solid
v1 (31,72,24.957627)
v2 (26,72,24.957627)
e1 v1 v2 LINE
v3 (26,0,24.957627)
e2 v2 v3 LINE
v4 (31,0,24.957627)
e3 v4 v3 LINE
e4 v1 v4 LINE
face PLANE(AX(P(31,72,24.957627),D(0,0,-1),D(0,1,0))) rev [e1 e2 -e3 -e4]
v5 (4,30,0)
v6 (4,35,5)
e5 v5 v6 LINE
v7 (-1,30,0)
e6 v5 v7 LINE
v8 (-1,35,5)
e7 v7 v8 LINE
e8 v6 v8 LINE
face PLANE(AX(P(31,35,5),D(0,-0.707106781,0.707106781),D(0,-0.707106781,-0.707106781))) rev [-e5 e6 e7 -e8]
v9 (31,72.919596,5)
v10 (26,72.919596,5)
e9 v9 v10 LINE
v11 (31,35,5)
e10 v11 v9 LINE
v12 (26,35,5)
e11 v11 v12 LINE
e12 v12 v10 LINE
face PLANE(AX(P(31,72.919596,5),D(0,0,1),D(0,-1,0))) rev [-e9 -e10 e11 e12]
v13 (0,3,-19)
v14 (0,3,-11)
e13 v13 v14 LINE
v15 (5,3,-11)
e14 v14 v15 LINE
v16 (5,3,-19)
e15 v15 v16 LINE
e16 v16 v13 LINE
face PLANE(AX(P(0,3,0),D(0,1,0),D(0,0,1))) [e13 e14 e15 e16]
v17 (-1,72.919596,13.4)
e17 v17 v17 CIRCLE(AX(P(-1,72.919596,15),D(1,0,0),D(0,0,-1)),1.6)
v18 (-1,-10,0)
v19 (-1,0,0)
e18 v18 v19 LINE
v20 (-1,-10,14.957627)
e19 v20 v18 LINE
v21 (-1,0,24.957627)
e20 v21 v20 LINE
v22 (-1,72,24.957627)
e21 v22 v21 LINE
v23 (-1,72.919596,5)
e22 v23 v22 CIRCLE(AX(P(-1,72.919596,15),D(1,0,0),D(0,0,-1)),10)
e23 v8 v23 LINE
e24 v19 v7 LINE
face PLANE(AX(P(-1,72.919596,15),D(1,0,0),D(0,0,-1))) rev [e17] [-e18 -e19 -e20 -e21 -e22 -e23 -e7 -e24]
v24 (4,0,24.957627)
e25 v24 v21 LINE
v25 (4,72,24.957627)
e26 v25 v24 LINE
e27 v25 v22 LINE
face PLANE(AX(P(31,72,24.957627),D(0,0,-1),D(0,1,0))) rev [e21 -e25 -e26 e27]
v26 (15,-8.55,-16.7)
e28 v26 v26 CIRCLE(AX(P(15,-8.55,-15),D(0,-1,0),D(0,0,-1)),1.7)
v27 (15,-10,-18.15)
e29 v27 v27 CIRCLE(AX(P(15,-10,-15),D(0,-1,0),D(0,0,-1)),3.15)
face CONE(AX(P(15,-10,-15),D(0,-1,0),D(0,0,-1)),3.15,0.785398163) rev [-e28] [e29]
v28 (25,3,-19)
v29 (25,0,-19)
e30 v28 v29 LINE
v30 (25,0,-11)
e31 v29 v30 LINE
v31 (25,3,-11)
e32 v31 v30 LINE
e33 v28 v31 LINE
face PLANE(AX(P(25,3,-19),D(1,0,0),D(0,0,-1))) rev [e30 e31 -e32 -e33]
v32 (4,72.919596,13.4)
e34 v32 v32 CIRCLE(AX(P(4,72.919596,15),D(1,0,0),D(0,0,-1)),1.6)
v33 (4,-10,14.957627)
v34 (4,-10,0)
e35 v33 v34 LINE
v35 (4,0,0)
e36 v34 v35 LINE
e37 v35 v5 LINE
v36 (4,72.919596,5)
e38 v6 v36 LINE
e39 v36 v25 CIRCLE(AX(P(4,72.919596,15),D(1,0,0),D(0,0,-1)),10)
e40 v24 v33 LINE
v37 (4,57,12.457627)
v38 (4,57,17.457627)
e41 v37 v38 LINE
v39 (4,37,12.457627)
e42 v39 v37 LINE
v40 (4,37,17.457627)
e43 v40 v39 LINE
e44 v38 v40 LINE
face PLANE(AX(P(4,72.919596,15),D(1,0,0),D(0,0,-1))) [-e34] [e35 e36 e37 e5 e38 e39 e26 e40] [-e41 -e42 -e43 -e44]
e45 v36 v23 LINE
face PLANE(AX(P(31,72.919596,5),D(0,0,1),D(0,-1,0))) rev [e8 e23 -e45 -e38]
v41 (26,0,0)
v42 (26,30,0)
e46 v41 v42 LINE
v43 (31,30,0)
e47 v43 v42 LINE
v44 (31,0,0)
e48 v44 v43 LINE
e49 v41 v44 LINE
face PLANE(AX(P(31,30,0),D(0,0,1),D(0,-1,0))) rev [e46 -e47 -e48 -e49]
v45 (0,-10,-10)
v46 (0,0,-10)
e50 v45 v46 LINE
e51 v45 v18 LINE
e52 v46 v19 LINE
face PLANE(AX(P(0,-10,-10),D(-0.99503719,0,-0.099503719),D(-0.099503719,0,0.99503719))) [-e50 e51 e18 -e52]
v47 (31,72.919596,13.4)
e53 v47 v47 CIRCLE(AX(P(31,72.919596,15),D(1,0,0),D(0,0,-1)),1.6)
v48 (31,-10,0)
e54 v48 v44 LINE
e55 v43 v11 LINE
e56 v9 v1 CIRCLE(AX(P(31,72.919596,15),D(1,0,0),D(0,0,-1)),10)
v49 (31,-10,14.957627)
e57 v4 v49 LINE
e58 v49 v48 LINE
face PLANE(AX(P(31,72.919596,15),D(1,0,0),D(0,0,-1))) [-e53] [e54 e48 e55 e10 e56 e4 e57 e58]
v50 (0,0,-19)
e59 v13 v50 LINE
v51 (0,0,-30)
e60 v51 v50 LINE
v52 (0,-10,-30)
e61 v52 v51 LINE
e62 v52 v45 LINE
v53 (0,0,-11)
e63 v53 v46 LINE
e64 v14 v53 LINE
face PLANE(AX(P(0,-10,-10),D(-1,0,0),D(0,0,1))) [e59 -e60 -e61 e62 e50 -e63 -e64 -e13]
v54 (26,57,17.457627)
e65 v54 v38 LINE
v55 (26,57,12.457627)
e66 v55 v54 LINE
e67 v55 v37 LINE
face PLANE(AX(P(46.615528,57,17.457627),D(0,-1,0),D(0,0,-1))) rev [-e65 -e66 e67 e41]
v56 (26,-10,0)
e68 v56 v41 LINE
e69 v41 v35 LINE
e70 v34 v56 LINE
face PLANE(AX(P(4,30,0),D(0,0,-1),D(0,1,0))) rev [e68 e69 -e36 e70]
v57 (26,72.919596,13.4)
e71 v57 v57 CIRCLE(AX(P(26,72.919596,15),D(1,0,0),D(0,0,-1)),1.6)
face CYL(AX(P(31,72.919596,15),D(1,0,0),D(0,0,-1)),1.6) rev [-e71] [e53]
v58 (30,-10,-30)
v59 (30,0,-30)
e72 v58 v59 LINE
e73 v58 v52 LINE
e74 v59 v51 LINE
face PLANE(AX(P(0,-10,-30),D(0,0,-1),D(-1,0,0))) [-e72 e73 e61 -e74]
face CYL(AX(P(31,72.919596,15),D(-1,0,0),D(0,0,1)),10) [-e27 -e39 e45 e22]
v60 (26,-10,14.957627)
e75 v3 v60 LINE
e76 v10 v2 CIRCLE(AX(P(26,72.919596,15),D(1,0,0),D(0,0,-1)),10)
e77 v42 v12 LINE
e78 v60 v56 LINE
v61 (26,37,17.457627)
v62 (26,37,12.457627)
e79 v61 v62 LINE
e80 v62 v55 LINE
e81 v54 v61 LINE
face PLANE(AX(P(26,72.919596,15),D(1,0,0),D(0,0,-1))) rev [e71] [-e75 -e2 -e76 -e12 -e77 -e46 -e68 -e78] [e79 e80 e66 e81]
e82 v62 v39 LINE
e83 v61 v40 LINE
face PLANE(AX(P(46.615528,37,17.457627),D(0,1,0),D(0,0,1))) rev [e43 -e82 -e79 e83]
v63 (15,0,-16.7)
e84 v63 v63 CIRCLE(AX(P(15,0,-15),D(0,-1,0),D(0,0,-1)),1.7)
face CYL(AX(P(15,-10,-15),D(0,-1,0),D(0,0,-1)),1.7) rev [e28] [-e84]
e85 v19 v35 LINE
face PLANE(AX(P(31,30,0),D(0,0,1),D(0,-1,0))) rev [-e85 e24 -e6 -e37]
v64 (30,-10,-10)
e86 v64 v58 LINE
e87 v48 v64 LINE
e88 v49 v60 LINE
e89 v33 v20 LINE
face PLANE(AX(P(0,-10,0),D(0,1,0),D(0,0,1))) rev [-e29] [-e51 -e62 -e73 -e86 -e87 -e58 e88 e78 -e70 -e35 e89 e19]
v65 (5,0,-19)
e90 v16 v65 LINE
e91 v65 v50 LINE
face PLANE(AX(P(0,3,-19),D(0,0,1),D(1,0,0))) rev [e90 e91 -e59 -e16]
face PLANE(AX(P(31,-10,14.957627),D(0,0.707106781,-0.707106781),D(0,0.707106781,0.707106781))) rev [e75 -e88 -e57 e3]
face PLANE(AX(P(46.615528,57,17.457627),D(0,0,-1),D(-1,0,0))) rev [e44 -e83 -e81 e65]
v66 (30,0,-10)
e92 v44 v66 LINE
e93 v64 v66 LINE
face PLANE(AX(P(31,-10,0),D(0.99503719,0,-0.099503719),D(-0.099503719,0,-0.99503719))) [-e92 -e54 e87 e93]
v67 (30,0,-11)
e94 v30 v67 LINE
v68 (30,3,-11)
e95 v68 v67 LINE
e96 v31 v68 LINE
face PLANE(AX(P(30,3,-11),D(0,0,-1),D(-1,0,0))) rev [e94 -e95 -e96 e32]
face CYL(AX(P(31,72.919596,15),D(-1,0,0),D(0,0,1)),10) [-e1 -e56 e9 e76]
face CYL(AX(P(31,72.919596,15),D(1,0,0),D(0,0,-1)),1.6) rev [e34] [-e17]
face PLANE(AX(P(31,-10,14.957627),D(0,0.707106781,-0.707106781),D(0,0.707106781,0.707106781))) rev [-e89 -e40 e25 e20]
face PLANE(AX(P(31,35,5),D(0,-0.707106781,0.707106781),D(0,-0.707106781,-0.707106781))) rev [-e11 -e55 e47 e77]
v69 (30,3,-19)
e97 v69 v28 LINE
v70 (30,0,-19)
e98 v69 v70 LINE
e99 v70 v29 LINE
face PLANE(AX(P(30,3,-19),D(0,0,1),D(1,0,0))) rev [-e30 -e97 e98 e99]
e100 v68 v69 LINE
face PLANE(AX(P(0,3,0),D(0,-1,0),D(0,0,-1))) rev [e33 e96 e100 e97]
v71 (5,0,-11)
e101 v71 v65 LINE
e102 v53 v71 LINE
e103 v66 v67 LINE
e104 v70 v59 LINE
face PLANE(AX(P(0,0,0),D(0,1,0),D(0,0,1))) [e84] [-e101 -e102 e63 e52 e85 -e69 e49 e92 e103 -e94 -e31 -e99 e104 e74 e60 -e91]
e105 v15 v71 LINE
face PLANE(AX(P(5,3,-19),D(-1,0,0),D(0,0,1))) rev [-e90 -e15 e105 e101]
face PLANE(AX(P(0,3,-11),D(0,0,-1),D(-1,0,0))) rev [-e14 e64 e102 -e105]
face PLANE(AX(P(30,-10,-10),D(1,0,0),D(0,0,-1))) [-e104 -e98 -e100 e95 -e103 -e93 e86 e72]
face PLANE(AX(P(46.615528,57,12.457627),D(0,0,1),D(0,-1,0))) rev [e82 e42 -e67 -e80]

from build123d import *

# Parameters (mm, degrees)
EXTRUDE_1_DEPTH     = 10
SKETCH_4_W          = 5
SKETCH_4_H          = 8
EXTRUDE_3_DEPTH     = 3
EXTRUDE_4_DEPTH     = 16
CUT_EXTRUDE_1_DEPTH = 11
SKETCH_15_W         = 5
SKETCH_15_H         = 20
EXTRUDE_5_DEPTH     = 22
OTHER_START         = -1
OTHER_4_OUTLINE_R   = 1.6
OTHER_4_DEPTH       = 32


# Read off the part's stored shape, not the designer's step: 高级异型孔3, 高级异型孔4
with BuildPart() as part:
    # 草图1 → 凸台-拉伸1 (new body)
    with BuildSketch(Plane(origin=(0, 0, 0), x_dir=(1, 0, 0), z_dir=(0, 1, 0))):
        Polygon((0, 10), (0, 30), (30, 30), (30, 10), (31, 0), (30, 0), (0, 0), (-1, 0), align=None)
    extrude(amount=-EXTRUDE_1_DEPTH)

    # 草图4 → 凸台-拉伸3 (add)
    with BuildSketch(Plane(origin=(0, 0, 0), x_dir=(1, 0, 0), z_dir=(0, 1, 0))):
        with Locations((2.5, 15)):
            Rectangle(SKETCH_4_W, SKETCH_4_H)
        with Locations((27.5, 15)):
            Rectangle(SKETCH_4_W, SKETCH_4_H)
    extrude(amount=EXTRUDE_3_DEPTH)

    # 高级异型孔3 outline → 高级异型孔3 (revolve, cut)
    with BuildSketch(Plane(origin=(15, 0, -15), x_dir=(1, 0, 0), z_dir=(0, 0, 1))):
        Polygon((0, -10), (3.15, -10), (1.7, -8.55), (1.7, 0), (0, 0), align=None)
    revolve(axis=Axis((15, 0, -15), (0, 1, 0)), mode=Mode.SUBTRACT)

    # 草图13 → 凸台-拉伸4 (add, symmetric)
    with BuildSketch(Plane(origin=(15, 0, 0), x_dir=(0, 0, -1), z_dir=(1, 0, 0))):
        with BuildLine():
            Line((-24.95762742, 72), (-24.95762742, 0))
            Line((-24.95762742, 0), (-14.95762742, -10))
            Line((-14.95762742, -10), (0, -10))
            Line((0, -10), (0, 30))
            Line((0, 30), (-5, 35))
            Line((-5, 35), (-5, 72.919595656))
            ThreePointArc((-5, 72.919595656), (-15.460285674, 82.908996895), (-24.95762742, 72))
        make_face()
    extrude(amount=EXTRUDE_4_DEPTH, both=True)

    # 草图13<2> → 切除-拉伸1 (cut, symmetric)
    with BuildSketch(Plane(origin=(15, 0, 0), x_dir=(0, 0, -1), z_dir=(1, 0, 0))):
        with BuildLine():
            Line((-24.95762742, 72), (-24.95762742, 0))
            Line((-24.95762742, 0), (-14.95762742, -10))
            Line((-14.95762742, -10), (0, -10))
            Line((0, -10), (0, 30))
            Line((0, 30), (-5, 35))
            Line((-5, 35), (-5, 72.919595656))
            ThreePointArc((-5, 72.919595656), (-15.460285674, 82.908996895), (-24.95762742, 72))
        make_face()
    extrude(amount=CUT_EXTRUDE_1_DEPTH, both=True, mode=Mode.SUBTRACT)

    # 草图15 → 凸台-拉伸5 (add)
    with BuildSketch(Plane(origin=(4, 0, 0), x_dir=(0, 0, -1), z_dir=(1, 0, 0))):
        with Locations((-14.95762742, 47)):
            Rectangle(SKETCH_15_W, SKETCH_15_H)
    extrude(amount=EXTRUDE_5_DEPTH)

    # 高级异型孔4 outline → 高级异型孔4 (cut)
    with BuildSketch(Plane.YZ.offset(OTHER_START)):
        with Locations((72.919595656, 15)):
            Circle(OTHER_4_OUTLINE_R)
    extrude(amount=OTHER_4_DEPTH, mode=Mode.SUBTRACT)


solid = part.part
